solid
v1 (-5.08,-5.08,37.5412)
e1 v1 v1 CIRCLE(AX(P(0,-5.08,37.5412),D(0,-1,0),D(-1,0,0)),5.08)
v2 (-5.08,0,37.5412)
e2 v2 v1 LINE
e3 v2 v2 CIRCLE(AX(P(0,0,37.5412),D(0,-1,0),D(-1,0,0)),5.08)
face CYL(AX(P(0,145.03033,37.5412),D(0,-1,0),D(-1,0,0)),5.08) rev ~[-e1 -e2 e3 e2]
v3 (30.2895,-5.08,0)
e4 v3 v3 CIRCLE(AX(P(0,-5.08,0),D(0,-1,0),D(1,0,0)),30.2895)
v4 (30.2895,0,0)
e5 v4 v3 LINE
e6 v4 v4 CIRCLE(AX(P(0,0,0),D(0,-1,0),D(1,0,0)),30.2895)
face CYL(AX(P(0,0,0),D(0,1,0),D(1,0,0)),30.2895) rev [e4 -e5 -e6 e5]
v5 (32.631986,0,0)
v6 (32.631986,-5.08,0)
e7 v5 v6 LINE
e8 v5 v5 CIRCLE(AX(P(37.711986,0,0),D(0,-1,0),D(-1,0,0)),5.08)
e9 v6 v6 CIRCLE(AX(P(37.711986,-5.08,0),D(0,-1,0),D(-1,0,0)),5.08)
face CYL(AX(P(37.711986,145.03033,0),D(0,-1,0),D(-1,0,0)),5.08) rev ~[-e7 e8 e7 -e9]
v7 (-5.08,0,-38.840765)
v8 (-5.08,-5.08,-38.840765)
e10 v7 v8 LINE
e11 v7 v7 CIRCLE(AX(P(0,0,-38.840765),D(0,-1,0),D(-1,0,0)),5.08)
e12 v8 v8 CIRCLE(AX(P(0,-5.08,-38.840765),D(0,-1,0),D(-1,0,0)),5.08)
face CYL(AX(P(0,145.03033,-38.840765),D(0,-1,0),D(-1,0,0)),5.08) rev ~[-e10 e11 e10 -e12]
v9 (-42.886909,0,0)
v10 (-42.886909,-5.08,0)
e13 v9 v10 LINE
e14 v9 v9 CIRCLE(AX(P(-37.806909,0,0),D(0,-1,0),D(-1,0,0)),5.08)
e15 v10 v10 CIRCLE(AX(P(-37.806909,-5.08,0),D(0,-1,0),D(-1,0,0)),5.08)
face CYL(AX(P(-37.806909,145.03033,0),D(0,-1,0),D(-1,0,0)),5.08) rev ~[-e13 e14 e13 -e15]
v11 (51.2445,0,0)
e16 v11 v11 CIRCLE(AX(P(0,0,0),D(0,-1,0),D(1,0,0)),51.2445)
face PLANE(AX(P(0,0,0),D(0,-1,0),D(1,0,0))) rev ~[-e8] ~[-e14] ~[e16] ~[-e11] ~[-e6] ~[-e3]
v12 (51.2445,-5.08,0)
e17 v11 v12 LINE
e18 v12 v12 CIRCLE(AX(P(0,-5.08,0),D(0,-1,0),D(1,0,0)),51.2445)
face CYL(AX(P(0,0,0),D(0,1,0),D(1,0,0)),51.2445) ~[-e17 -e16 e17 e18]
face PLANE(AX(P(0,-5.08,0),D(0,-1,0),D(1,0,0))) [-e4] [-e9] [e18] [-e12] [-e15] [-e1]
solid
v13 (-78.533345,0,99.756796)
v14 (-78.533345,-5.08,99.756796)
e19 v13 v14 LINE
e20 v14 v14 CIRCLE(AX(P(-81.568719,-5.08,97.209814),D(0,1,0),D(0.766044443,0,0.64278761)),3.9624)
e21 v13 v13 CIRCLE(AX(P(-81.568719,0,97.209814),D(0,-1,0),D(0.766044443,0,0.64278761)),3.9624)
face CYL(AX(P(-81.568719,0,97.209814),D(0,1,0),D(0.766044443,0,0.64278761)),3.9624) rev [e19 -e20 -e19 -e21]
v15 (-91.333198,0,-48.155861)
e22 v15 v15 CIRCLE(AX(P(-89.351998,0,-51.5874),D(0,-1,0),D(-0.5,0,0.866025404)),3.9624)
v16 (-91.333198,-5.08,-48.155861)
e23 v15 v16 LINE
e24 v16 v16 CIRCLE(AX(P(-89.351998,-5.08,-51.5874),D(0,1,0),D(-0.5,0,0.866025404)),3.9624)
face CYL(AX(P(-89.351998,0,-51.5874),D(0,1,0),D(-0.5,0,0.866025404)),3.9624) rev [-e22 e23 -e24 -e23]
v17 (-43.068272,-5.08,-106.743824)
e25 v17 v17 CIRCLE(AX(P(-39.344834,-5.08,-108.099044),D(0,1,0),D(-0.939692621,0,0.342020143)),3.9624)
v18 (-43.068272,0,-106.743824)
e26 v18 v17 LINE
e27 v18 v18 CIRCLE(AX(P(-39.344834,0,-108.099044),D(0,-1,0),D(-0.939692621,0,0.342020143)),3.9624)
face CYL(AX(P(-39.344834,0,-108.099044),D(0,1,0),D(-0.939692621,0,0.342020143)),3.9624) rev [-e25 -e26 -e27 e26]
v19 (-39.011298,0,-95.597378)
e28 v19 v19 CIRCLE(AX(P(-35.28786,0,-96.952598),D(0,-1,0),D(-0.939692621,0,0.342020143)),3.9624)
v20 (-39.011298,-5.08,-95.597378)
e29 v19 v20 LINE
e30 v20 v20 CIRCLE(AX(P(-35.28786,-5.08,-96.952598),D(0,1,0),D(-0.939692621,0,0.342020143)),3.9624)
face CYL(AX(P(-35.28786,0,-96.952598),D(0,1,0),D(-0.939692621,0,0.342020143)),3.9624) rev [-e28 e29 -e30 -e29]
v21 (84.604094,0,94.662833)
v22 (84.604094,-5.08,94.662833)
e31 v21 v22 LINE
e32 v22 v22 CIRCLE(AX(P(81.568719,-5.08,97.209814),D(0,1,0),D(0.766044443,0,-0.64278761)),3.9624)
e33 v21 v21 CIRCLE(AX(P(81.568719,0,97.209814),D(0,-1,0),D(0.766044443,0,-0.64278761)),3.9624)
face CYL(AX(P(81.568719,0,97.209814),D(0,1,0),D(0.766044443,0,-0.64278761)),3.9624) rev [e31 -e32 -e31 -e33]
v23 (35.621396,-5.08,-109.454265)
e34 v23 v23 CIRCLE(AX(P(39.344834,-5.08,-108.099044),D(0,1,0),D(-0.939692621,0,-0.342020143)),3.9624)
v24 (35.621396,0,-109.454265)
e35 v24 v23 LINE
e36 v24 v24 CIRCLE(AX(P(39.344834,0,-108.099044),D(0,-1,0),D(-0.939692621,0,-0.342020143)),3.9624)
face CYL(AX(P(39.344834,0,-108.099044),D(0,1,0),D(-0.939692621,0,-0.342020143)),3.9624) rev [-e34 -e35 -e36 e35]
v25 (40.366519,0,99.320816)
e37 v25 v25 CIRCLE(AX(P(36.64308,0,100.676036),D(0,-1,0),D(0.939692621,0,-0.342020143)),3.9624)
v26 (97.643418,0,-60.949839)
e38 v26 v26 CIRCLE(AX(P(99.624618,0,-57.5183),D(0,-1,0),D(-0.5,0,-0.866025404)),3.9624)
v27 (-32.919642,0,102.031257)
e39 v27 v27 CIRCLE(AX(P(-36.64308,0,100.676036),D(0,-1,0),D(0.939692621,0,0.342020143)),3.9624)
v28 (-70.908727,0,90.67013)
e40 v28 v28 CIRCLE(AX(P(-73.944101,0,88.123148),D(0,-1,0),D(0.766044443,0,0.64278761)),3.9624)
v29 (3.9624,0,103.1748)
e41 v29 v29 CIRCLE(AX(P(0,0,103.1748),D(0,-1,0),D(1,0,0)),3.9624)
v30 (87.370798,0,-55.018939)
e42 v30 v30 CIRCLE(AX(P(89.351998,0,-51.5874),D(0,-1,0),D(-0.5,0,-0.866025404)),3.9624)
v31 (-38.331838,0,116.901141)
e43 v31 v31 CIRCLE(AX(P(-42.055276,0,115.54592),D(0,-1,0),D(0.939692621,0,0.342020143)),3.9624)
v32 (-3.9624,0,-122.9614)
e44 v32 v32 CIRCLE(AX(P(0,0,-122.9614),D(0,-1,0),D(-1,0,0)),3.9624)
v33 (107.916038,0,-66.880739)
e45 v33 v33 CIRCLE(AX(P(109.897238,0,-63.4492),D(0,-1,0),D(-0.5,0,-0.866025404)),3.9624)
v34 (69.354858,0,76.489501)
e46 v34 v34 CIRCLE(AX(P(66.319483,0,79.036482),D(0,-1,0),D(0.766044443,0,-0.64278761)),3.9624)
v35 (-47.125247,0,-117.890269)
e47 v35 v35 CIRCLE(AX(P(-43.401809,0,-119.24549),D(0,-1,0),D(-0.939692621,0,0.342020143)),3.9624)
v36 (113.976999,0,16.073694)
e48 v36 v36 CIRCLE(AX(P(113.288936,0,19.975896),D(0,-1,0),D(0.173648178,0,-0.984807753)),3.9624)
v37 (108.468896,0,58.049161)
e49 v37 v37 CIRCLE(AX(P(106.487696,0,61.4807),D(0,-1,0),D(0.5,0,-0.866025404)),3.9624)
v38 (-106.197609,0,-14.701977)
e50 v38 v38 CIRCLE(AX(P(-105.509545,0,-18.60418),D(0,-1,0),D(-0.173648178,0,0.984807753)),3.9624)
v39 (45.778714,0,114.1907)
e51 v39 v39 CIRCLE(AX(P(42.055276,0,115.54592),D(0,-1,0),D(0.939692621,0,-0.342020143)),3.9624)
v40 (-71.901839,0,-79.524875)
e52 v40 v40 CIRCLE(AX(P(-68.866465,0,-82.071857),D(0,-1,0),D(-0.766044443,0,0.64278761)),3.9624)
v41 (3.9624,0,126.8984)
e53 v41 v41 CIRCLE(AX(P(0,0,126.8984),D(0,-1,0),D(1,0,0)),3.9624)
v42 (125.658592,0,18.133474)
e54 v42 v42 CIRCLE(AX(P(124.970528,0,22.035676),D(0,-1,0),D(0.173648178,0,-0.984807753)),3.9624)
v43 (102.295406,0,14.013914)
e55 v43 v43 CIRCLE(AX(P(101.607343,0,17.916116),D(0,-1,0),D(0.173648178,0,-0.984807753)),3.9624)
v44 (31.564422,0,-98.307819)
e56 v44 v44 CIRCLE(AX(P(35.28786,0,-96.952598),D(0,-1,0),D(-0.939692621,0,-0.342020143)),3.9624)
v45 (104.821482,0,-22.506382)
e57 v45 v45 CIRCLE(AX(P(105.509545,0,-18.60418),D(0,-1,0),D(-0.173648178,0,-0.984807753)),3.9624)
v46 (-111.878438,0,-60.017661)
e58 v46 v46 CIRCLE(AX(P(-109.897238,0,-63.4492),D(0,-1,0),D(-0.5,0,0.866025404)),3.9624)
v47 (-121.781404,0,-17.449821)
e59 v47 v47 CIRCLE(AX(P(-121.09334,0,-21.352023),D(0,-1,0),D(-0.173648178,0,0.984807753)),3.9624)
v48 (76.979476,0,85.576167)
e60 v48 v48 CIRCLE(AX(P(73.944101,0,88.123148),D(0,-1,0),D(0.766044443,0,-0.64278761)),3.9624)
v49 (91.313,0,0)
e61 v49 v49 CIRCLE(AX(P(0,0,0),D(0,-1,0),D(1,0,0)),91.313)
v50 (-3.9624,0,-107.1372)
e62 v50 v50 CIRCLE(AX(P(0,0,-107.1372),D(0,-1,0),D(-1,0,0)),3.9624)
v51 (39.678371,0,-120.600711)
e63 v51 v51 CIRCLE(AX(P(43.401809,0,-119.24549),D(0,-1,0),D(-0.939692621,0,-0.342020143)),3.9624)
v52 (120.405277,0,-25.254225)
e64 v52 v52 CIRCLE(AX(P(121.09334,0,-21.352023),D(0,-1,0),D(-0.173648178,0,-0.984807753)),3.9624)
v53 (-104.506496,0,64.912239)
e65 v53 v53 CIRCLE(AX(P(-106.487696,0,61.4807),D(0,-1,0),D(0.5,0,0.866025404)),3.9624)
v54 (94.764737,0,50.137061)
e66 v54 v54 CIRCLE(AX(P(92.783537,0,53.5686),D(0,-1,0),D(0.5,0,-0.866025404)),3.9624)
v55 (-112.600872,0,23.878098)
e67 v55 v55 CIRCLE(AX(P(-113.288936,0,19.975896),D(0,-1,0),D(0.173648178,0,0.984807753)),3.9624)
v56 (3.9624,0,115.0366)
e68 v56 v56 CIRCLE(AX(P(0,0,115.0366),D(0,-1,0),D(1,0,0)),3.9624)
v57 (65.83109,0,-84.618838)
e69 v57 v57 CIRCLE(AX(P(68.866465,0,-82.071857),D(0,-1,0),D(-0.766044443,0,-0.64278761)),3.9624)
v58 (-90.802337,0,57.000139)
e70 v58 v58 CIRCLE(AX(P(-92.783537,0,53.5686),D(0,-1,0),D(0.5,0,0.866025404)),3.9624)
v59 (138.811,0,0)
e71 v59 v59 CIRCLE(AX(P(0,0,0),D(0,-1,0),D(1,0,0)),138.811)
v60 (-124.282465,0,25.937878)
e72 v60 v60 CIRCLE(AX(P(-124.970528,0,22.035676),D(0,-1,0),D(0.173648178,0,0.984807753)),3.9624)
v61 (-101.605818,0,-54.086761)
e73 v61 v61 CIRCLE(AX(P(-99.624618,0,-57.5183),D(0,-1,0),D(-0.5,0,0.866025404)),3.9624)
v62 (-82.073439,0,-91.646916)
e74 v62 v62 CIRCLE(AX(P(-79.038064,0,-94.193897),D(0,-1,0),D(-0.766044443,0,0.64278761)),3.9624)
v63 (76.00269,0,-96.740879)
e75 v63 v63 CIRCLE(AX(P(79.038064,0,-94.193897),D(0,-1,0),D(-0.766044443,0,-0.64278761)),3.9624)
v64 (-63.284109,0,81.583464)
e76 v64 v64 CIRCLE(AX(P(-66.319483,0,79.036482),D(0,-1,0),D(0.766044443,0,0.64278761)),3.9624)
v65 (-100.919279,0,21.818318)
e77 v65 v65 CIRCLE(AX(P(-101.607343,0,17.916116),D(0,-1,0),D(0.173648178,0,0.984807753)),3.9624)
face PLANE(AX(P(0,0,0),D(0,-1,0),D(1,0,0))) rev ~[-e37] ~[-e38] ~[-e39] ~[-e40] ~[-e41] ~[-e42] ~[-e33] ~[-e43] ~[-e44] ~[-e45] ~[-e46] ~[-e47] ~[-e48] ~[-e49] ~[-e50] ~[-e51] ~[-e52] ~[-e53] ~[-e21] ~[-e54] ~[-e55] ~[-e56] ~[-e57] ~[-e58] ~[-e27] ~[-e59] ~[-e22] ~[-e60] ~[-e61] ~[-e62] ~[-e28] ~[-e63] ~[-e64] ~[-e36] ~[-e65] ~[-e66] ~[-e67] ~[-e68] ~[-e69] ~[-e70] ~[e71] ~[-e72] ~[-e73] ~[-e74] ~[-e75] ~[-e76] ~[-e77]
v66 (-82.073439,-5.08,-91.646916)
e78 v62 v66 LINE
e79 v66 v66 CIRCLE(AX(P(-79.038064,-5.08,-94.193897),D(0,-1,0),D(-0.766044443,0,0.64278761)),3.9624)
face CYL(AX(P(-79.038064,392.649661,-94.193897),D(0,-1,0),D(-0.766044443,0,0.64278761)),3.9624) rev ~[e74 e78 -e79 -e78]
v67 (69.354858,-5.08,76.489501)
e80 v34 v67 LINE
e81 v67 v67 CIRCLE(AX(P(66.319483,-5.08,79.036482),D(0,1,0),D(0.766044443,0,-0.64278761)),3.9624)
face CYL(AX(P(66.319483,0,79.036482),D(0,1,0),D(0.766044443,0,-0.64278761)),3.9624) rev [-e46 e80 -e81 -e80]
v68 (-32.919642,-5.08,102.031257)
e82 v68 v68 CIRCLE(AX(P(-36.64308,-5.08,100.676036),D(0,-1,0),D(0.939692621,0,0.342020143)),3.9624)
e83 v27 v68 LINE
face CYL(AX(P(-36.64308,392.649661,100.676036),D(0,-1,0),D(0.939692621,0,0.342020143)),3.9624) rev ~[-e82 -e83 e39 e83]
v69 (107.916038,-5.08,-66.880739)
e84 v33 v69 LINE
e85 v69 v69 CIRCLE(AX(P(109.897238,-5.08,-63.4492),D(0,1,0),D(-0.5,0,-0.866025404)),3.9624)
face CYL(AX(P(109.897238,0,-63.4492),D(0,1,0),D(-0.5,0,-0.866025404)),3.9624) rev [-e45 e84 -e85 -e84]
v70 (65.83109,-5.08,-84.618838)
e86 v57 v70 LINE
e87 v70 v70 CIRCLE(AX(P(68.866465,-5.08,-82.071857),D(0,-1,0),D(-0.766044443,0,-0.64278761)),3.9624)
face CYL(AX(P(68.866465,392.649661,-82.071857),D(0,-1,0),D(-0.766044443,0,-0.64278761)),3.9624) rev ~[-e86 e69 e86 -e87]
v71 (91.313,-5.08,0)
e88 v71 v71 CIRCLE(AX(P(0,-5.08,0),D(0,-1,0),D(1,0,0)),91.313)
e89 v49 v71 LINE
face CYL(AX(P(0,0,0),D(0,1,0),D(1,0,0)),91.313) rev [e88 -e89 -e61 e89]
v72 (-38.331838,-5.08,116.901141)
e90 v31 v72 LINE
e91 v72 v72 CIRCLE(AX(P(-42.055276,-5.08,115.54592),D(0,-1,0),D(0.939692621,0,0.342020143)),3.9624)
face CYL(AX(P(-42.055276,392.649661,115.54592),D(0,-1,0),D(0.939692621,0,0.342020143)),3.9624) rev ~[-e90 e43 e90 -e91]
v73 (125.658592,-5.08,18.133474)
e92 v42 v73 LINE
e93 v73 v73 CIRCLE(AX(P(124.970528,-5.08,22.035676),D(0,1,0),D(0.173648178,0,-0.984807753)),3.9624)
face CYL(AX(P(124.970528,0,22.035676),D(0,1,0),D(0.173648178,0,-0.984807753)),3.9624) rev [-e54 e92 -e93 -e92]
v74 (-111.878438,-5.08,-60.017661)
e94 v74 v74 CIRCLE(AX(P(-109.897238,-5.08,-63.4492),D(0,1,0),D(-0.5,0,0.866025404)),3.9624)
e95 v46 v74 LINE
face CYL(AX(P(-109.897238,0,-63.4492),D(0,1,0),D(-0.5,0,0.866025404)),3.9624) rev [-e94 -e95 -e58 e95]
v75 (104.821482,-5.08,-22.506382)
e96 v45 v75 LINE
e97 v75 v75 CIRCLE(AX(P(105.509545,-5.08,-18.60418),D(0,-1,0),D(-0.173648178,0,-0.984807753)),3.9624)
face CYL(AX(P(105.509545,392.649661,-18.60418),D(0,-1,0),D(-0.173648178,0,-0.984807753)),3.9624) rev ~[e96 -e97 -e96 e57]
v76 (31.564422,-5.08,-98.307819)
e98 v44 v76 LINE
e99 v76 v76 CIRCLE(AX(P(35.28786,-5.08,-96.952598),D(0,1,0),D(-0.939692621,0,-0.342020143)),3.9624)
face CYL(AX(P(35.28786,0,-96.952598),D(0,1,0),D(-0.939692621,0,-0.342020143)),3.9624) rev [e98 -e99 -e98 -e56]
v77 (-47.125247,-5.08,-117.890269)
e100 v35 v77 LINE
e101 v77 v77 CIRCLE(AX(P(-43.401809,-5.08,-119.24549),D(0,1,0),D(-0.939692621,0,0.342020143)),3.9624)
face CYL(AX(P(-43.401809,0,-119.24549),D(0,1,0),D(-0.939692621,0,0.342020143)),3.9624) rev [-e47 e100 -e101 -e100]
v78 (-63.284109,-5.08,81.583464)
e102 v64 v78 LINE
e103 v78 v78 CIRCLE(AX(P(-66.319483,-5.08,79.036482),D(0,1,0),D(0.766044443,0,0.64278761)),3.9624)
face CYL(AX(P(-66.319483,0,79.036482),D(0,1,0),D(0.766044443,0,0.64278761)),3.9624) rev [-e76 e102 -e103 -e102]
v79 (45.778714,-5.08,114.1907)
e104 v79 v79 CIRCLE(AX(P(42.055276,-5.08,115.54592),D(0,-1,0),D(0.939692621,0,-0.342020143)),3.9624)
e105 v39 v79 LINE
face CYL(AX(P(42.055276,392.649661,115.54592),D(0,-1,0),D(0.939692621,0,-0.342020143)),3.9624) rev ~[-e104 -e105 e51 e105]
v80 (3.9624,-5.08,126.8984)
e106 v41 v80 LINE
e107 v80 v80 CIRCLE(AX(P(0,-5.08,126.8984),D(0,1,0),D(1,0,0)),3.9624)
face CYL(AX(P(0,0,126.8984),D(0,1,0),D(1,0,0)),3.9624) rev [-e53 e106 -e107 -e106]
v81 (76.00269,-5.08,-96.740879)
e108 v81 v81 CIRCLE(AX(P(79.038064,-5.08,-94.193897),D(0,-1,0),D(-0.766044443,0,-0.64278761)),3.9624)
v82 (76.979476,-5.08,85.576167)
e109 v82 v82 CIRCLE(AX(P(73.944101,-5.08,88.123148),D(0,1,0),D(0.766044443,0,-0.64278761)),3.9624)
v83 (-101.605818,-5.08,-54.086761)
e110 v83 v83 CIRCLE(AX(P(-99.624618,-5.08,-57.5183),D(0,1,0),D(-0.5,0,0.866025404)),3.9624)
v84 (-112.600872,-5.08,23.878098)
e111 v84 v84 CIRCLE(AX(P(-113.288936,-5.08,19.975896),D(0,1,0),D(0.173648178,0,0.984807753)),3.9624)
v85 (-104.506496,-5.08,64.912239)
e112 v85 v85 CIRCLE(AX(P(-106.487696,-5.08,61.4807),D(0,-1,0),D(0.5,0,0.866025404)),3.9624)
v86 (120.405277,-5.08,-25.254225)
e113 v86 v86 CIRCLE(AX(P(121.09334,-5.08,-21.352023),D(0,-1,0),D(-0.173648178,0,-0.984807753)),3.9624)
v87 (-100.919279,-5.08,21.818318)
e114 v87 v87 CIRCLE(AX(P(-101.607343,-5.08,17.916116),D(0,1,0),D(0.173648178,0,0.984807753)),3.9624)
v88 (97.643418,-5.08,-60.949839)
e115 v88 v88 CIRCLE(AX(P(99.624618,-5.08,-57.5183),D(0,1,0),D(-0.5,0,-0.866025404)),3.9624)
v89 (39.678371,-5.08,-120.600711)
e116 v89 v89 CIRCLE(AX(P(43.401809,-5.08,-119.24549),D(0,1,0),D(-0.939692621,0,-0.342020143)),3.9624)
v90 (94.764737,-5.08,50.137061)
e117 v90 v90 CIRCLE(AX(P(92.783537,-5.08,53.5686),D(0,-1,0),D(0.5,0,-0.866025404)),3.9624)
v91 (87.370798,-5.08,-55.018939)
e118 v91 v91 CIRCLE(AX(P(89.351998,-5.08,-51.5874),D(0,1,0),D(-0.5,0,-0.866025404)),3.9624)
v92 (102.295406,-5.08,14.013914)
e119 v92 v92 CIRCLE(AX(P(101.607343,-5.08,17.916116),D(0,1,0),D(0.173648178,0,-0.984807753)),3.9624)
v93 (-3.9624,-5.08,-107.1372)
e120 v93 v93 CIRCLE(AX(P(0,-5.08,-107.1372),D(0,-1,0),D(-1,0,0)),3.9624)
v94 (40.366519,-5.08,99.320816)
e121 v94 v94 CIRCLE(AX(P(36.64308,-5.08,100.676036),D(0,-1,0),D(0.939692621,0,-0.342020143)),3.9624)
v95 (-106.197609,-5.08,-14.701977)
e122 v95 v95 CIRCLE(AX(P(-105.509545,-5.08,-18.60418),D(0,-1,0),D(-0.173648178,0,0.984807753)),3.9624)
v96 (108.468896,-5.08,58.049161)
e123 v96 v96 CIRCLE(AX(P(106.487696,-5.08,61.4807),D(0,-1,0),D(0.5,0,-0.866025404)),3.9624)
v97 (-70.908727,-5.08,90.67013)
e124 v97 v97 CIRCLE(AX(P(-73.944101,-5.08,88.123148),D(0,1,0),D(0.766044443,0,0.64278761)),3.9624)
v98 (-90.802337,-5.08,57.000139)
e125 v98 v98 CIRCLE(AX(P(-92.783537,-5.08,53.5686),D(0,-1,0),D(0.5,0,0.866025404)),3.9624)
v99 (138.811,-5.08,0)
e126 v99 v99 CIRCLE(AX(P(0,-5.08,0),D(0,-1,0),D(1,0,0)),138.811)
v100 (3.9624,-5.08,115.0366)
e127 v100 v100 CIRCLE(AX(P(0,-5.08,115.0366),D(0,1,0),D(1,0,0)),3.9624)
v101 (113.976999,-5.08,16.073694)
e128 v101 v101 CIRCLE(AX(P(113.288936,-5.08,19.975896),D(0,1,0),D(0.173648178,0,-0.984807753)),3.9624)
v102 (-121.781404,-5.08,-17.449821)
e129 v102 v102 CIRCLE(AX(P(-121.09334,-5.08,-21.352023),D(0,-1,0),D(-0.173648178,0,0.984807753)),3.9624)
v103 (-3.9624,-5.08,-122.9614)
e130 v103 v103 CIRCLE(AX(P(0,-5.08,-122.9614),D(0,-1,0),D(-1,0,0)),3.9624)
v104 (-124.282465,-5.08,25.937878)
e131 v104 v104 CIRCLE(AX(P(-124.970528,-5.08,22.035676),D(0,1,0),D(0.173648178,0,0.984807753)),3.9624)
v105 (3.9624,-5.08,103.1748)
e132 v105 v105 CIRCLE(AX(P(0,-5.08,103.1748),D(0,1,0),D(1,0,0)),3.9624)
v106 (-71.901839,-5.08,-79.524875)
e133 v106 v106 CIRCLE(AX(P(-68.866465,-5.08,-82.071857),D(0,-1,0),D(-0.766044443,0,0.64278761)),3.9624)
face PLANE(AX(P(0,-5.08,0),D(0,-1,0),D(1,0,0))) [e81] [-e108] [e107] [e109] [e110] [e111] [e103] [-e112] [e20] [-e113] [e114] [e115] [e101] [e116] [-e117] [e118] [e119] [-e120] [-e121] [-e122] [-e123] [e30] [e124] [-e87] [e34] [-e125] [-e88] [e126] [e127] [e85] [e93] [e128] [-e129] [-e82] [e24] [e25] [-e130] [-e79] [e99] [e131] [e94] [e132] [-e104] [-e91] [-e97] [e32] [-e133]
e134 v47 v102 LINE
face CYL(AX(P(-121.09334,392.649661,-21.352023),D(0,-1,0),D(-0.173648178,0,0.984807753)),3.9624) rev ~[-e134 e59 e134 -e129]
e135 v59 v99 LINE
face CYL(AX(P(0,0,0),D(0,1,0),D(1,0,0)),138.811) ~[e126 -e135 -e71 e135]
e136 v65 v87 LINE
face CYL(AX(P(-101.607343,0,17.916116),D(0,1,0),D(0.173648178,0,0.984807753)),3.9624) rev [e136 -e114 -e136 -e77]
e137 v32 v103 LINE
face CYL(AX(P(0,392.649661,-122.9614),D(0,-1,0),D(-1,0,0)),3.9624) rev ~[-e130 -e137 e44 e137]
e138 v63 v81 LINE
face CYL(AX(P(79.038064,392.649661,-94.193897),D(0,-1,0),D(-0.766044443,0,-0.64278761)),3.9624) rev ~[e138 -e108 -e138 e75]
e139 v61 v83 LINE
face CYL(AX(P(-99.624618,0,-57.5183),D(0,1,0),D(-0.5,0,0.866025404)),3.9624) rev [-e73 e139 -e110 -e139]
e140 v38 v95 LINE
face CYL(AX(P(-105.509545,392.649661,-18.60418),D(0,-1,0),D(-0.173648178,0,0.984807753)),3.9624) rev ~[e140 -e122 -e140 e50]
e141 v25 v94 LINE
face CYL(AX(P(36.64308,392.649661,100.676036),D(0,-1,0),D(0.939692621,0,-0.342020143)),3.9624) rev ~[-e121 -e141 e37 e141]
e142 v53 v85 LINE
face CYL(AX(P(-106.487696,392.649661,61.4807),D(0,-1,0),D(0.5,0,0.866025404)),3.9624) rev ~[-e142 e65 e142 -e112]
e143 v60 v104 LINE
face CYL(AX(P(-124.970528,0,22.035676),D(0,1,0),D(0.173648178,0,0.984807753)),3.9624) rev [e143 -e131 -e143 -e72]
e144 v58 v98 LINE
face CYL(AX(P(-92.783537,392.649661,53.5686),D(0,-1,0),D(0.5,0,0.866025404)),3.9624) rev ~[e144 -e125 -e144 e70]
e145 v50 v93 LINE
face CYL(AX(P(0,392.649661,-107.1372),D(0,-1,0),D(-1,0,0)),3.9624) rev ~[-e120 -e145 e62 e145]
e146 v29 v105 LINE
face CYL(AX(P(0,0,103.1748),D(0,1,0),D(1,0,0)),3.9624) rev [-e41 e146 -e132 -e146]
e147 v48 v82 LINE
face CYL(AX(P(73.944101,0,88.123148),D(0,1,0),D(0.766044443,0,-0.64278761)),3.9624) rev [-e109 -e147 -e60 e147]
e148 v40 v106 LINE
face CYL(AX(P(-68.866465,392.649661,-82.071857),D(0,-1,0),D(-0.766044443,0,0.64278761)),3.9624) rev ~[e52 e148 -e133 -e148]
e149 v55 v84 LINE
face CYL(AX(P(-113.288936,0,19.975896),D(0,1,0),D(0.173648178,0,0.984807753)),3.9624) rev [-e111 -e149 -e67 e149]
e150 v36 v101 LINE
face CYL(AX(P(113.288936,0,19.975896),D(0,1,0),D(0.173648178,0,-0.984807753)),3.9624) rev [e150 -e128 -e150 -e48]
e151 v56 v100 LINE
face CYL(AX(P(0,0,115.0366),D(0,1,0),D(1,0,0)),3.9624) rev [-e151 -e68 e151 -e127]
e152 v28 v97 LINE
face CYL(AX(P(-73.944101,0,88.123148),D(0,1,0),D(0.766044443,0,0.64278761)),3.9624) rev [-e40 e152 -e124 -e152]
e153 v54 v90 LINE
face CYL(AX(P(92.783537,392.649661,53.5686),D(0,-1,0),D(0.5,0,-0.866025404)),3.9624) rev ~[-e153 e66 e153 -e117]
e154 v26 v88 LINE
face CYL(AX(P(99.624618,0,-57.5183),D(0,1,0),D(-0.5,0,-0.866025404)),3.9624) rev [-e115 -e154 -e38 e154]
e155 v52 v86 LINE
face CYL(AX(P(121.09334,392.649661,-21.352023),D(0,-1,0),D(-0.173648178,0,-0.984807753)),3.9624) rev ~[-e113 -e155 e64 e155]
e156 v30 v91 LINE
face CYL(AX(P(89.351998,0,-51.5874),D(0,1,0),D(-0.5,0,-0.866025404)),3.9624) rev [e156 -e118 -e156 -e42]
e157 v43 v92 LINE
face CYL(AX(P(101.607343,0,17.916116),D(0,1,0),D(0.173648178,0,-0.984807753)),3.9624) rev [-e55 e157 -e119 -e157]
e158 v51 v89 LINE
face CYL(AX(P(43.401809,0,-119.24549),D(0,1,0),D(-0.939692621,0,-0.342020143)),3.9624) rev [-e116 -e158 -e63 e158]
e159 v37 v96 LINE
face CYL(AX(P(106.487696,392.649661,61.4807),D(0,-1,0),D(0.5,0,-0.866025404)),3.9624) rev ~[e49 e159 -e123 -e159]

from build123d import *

# Parameters (mm, degrees)
F0_R            = 138.811
F0_R_2          = 91.313
F3_DEPTH        = 5.08
F2_R            = 3.9624
F4_DEPTH        = 5.081
F4_COPIES_COUNT = 9
F6_D            = 7.9248
F6_COPIES_COUNT = 9
F0_R_3          = 51.2445
F0_R_4          = 30.2895
F7_DEPTH        = 5.08
F8_D            = 10.16


# Not quite as in the source:
# - a pattern or mirror of a feature is missing from the dataset's text; its kind, count and spacing are read off the source's solid


with BuildPart() as f3:
    # F0 (on Front) → F3 (new body)
    with BuildSketch(Plane.XZ):
        Circle(F0_R)
        Circle(F0_R_2, mode=Mode.SUBTRACT)
    extrude(amount=F3_DEPTH)

    # F2 (on face) → F4 (cut, through all)
    with BuildSketch(Plane.XZ):
        with Locations((0, 103.1748)):
            Circle(F2_R)
        with Locations((0, 115.0366)):
            Circle(F2_R)
        with Locations((0, 126.8984)):
            Circle(F2_R)
    f4 = extrude(amount=F4_DEPTH, mode=Mode.SUBTRACT)

    # F4_copies: F4 ×9 about axis
    f4_copies_axis = Axis((0, 0, 0), (0, 1, 0))
    for i in range(1, F4_COPIES_COUNT):
        add(f4.rotate(f4_copies_axis, i * 360 / F4_COPIES_COUNT), mode=Mode.SUBTRACT)

    # F6 (through all)
    with Locations(Plane(origin=(0, 0, 0), x_dir=(1, 0, 0), z_dir=(0, 1, 0))):
        with Locations((0, 107.1372), (0, 122.9614)):
            f6 = Hole(F6_D / 2)

    # F6_copies: F6 ×9 about axis
    f6_copies_axis = Axis((0, 0, 0), (0, 1, 0))
    for i in range(1, F6_COPIES_COUNT):
        add(f6.rotate(f6_copies_axis, i * 360 / F6_COPIES_COUNT), mode=Mode.SUBTRACT)


with BuildPart() as f7:
    # F0 (on Front) → F7 (new body)
    with BuildSketch(Plane.XZ):
        Circle(F0_R_3)
        Circle(F0_R_4, mode=Mode.SUBTRACT)
    extrude(amount=F7_DEPTH)

    # F8 (through all)
    with Locations(Plane(origin=(0, 0, 0), x_dir=(1, 0, 0), z_dir=(0, 1, 0))):
        with Locations((0, -37.5412), (37.7119863628, 0), (0, 38.8407654956), (-37.8069085799, 0)):
            Hole(F8_D / 2)


solid = Compound([f3.part, f7.part])
